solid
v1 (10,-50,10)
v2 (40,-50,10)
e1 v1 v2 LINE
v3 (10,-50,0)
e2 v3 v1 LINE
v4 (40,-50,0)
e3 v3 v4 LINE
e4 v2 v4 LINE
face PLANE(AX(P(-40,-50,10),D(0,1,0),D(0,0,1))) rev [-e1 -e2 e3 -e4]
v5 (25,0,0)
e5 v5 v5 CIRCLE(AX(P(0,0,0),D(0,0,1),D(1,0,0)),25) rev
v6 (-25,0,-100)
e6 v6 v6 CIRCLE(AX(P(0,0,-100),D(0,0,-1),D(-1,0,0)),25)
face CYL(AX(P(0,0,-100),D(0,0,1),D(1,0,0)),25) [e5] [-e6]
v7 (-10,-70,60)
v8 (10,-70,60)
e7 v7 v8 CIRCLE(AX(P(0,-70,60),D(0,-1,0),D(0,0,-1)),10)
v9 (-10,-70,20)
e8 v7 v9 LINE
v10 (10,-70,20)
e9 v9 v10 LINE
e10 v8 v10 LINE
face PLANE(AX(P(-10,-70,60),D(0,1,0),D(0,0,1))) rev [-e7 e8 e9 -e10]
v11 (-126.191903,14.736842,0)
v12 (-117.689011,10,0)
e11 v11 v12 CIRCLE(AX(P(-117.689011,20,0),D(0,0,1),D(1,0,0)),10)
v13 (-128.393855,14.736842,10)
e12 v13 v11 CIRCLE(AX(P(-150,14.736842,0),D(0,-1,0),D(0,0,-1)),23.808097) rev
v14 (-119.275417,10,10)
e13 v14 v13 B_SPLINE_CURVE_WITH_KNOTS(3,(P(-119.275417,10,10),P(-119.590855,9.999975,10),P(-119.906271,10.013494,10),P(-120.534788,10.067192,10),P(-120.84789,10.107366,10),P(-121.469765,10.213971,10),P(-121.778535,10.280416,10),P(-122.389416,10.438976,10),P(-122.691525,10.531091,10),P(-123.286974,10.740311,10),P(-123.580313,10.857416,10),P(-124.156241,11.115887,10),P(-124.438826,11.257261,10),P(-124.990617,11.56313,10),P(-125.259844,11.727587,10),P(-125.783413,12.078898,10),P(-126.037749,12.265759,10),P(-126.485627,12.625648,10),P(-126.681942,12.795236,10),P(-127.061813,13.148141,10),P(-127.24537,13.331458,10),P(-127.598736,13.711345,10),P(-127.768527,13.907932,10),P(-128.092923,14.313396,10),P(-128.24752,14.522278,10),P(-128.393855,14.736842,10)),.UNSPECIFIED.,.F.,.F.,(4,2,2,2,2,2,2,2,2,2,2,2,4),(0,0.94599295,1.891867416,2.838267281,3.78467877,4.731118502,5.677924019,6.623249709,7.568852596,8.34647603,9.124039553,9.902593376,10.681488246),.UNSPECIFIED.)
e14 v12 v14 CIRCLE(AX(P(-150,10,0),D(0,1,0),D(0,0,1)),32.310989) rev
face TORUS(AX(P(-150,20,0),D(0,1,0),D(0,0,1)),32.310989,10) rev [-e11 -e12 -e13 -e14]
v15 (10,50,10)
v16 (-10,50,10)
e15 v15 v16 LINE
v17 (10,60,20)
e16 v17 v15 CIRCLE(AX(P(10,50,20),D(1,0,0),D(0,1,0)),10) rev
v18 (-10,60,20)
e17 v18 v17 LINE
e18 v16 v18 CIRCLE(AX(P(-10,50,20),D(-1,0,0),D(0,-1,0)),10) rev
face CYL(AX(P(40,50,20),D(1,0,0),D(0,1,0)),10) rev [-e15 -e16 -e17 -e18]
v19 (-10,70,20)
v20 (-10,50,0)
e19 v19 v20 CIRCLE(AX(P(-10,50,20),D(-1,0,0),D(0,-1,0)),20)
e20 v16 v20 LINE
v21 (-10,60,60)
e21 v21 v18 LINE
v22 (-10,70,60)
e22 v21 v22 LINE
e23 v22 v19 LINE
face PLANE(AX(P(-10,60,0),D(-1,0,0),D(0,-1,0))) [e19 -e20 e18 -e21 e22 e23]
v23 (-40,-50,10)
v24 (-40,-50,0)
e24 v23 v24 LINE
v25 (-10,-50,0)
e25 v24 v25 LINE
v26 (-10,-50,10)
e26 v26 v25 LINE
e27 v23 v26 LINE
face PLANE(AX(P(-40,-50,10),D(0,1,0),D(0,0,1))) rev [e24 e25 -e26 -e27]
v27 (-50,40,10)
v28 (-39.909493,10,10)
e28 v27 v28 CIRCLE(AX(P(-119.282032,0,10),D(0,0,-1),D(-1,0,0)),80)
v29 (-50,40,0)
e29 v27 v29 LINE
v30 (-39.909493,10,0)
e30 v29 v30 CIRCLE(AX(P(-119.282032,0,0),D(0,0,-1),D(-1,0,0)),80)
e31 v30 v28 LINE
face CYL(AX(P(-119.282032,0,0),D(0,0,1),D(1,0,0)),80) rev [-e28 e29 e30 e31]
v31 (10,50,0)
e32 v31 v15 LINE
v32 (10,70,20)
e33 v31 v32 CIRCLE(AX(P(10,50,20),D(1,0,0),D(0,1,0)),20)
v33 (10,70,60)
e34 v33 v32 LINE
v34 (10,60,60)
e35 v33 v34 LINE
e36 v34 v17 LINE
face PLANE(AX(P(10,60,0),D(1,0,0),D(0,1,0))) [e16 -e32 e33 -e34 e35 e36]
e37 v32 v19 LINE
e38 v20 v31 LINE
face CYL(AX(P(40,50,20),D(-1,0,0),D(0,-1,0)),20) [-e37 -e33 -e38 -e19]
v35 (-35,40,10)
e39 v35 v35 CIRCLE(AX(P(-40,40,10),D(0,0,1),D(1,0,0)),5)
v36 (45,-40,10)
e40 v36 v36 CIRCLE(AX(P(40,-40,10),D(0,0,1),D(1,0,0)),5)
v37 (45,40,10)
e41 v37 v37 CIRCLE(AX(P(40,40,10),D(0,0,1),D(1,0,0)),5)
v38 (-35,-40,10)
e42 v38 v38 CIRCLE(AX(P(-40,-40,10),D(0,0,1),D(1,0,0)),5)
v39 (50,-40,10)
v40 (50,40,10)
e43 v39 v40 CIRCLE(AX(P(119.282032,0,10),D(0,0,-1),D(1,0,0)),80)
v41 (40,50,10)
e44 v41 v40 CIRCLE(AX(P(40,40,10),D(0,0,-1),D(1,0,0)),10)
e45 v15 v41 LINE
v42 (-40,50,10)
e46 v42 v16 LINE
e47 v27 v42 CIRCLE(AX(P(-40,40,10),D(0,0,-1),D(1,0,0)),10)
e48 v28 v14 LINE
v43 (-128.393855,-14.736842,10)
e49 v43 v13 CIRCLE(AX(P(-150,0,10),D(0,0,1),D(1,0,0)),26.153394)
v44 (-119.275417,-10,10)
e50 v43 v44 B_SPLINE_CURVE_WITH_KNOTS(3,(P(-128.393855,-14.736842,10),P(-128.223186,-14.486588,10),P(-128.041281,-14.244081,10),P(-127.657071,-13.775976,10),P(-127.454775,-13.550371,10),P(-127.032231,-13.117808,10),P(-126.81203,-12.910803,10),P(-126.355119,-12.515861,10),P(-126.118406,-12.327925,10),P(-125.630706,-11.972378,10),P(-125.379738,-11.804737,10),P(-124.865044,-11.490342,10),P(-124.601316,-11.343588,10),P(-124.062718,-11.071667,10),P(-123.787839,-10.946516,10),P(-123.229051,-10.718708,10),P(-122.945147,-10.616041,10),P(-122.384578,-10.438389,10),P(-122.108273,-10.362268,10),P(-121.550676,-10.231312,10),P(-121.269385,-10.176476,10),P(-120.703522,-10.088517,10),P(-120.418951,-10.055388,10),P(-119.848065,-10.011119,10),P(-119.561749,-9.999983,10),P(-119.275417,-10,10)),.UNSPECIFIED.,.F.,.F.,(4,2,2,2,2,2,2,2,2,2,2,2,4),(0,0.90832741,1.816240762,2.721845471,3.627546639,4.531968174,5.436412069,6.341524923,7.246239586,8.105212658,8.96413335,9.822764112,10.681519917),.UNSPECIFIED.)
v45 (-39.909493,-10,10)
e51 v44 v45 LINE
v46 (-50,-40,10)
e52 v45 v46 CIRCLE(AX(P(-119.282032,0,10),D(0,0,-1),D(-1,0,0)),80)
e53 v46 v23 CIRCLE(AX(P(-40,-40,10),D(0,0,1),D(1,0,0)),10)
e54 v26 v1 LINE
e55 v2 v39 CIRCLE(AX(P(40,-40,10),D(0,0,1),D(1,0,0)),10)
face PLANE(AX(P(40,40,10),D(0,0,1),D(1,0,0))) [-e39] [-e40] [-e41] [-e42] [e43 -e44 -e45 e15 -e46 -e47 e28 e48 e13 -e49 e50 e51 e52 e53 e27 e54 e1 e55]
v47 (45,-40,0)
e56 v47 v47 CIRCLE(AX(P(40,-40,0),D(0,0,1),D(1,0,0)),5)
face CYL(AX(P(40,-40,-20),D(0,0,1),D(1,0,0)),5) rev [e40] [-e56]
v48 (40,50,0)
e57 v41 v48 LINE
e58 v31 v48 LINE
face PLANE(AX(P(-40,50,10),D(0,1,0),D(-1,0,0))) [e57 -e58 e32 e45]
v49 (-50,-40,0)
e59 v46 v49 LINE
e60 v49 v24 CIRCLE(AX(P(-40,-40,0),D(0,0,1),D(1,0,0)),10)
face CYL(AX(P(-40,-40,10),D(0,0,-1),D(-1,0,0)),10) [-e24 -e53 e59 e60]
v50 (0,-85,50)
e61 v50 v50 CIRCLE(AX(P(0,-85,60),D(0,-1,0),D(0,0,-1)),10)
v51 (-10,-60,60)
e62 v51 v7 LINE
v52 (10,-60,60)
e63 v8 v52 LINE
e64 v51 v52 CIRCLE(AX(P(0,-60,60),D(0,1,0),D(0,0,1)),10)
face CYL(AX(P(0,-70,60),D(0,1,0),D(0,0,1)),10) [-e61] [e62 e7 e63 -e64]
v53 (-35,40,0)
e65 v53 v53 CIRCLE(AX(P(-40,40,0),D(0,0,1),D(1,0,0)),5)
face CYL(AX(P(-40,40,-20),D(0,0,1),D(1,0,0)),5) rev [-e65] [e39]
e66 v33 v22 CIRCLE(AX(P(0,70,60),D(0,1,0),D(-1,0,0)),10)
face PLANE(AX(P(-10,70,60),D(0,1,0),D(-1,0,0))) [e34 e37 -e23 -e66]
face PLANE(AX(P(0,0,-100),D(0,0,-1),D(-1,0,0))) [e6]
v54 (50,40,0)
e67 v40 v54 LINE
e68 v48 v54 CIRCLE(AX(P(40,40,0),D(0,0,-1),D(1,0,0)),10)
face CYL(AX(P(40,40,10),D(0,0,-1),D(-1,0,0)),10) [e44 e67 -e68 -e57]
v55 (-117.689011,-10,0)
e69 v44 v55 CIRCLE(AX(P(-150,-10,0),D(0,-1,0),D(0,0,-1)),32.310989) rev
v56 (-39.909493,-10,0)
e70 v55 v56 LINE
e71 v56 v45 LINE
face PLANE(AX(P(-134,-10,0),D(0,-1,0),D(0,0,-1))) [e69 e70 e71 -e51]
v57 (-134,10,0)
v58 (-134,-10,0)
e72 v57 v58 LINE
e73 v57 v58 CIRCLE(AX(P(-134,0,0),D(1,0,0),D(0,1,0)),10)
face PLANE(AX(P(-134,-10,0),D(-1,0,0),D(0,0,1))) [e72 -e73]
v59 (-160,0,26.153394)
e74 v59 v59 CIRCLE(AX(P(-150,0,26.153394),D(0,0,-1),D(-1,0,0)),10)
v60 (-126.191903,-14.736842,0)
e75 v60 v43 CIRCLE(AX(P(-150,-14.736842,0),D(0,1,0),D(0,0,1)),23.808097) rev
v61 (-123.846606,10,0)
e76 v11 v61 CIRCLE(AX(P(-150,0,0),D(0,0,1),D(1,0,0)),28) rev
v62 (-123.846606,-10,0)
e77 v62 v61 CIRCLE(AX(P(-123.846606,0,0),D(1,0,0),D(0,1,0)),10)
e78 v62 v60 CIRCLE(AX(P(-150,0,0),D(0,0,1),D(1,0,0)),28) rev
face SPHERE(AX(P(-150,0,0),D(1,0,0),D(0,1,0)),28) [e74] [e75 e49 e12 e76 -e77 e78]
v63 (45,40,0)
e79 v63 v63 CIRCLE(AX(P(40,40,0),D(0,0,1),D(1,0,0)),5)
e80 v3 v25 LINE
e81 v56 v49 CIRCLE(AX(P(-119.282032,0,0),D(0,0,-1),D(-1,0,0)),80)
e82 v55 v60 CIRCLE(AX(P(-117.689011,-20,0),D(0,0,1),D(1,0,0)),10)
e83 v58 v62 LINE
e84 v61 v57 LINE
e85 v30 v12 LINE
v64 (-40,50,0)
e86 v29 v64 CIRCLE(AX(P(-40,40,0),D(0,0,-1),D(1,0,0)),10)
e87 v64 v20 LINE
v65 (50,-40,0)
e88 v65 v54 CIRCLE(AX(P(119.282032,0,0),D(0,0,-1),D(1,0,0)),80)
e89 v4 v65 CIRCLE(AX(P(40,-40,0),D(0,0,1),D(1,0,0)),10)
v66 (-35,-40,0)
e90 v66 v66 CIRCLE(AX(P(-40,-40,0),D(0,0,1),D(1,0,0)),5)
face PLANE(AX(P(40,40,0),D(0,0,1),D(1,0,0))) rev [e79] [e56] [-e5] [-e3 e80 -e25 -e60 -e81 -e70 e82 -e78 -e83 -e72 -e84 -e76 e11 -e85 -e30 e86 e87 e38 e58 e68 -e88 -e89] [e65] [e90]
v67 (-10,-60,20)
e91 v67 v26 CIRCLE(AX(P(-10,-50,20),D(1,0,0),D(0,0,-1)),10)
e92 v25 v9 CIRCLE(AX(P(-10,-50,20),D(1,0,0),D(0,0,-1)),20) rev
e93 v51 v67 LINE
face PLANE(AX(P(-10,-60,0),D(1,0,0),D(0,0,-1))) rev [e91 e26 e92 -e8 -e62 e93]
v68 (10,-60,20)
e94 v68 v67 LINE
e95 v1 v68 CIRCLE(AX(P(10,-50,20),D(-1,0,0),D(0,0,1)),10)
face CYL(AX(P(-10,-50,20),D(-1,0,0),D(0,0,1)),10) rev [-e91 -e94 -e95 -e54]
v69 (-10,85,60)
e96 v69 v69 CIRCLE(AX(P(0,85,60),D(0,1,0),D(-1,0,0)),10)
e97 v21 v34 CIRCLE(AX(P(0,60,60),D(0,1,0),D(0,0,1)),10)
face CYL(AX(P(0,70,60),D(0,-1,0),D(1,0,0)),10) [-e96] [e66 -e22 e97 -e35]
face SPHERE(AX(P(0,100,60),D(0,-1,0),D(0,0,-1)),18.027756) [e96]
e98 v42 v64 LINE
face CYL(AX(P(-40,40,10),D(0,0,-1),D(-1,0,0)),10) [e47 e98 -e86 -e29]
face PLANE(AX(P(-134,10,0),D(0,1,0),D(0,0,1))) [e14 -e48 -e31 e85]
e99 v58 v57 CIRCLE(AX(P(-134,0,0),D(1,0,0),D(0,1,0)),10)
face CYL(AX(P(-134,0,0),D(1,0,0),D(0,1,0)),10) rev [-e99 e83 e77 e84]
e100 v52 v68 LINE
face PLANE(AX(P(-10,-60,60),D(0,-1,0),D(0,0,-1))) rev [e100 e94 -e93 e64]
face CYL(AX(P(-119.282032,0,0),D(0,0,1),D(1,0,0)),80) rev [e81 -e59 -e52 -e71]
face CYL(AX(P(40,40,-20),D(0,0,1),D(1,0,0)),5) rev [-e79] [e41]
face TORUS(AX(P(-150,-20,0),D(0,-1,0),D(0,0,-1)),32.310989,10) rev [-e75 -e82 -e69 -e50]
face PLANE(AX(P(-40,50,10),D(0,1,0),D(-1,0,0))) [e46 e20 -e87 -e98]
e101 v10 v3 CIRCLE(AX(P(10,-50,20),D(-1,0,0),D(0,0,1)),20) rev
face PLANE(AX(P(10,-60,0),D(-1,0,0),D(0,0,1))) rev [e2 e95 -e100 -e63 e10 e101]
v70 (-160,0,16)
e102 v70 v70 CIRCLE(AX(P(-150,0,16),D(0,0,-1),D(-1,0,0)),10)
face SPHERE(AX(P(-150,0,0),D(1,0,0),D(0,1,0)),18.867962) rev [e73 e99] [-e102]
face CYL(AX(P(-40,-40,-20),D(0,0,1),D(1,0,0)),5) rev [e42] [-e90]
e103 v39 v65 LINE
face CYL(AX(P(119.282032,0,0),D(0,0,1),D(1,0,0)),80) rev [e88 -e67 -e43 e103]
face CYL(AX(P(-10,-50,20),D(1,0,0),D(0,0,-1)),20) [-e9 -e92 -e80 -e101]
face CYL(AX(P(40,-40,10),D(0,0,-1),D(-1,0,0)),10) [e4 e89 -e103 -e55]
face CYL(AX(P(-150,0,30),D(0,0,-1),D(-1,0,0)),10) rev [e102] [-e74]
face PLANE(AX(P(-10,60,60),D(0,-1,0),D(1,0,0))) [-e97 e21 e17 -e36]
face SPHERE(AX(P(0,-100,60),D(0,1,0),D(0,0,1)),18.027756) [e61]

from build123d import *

# Parameters (mm, degrees)
BOSS_EXTRUDE1_DEPTH  = 10
CUT_EXTRUDE1_DEPTH   = 10
SKETCH6_W            = 20
SKETCH6_H            = 10
BOSS_EXTRUDE5_DEPTH  = 10
SKETCH7_W            = 20
SKETCH7_H            = 10
BOSS_EXTRUDE6_DEPTH  = 60
FILLET7_R            = 20
FILLET8_R            = 10
BOSS_EXTRUDE7_DEPTH  = 10
CUT_EXTRUDE7_DEPTH   = 18
FILLET7_OF_MIRROR2_R = 20
FILLET8_OF_MIRROR2_R = 10
SKETCH19_R           = 5
CUT_EXTRUDE9_DEPTH   = 30
SKETCH29_R           = 10
BOSS_EXTRUDE16_DEPTH = 15
SKETCH31_R           = 10
BOSS_EXTRUDE17_DEPTH = 15
BOSS_EXTRUDE21_DEPTH = 10
FILLET9_R            = 10
FILLET10_R           = 10
SKETCH35_R           = 10
CUT_EXTRUDE11_DEPTH  = 30
SKETCH16_R           = 25
BOSS_EXTRUDE22_DEPTH = 100


with BuildPart() as part:
    # Sketch2 → Boss-Extrude1 (new body)
    with BuildSketch(Plane.XY):
        with BuildLine():
            Line((-40, 50), (40, 50))
            ThreePointArc((40, 50), (47.071067812, 47.071067812), (50, 40))
            Line((50, 40), (50, -40))
            ThreePointArc((50, -40), (47.071067812, -47.071067812), (40, -50))
            Line((40, -50), (-40, -50))
            ThreePointArc((-40, -50), (-47.071067812, -47.071067812), (-50, -40))
            Line((-50, -40), (-50, 40))
            ThreePointArc((-50, 40), (-47.071067812, 47.071067812), (-40, 50))
        make_face()
    boss_extrude1 = extrude(amount=BOSS_EXTRUDE1_DEPTH)

    # Sketch3 → Cut-Extrude1 (cut)
    with BuildSketch(Plane.XY.offset(10)):
        with BuildLine():
            Line((-50, 40), (-50, -40))
            ThreePointArc((-50, -40), (-39.282032303, 0), (-50, 40))
        make_face()
        with BuildLine():
            Line((50, 40), (50, -40))
            ThreePointArc((50, -40), (39.282032303, 0), (50, 40))
        make_face()
    cut_extrude1 = extrude(amount=-CUT_EXTRUDE1_DEPTH, mode=Mode.SUBTRACT)

    # Sketch6 → Boss-Extrude5 (add)
    with BuildSketch(Plane.XZ.offset(50)):
        with Locations((0, 5)):
            Rectangle(SKETCH6_W, SKETCH6_H)
    boss_extrude5 = extrude(amount=BOSS_EXTRUDE5_DEPTH)

    # Sketch7 → Boss-Extrude6 (add)
    with BuildSketch(Plane.XY):
        with Locations((0, -65)):
            Rectangle(SKETCH7_W, SKETCH7_H)
    boss_extrude6 = extrude(amount=BOSS_EXTRUDE6_DEPTH)

    # Fillet7
    fillet7_edges = [part.edges().sort_by_distance(p)[0] for p in [
        (0, -70, 0),
    ]]
    fillet(fillet7_edges, radius=FILLET7_R)

    # Fillet8
    fillet8_edges = [part.edges().sort_by_distance(p)[0] for p in [
        (0, -60, 10),
    ]]
    fillet(fillet8_edges, radius=FILLET8_R)

    # Sketch8 → Boss-Extrude7 (add)
    with BuildSketch(Plane(origin=(0, -60, 0), x_dir=(1, 0, 0), z_dir=(0, 1, 0))):
        with BuildLine():
            Line((10, -60), (-10, -60))
            ThreePointArc((-10, -60), (0, -70), (10, -60))
        make_face()
    boss_extrude7 = extrude(amount=-BOSS_EXTRUDE7_DEPTH)

    # Sketch14 → Cut-Extrude7 (cut)
    with BuildSketch(Plane.XY.offset(10)):
        with BuildLine():
            Line((-39.282032303, 0), (39.282032303, 0))
            add(Edge.make_bspline(
                [(50, 40), (39.359472874, 21.350658255), (39.282032303, 0)],
                knots=[0, 0, 0, 1, 1, 1], degree=2))
            add(Edge.make_bspline(
                [(40, 50), (49.142135624, 49.142135624), (50, 40)],
                knots=[0, 0, 0, 1, 1, 1], degree=2))
            Line((40, 50), (-40, 50))
            add(Edge.make_bspline(
                [(-50, 40), (-49.142135624, 49.142135624), (-40, 50)],
                knots=[0, 0, 0, 1, 1, 1], degree=2))
            add(Edge.make_bspline(
                [(-39.282032303, 0), (-39.359472874, 21.350658255), (-50, 40)],
                knots=[0, 0, 0, 1, 1, 1], degree=2))
        make_face()
    extrude(amount=-CUT_EXTRUDE7_DEPTH, mode=Mode.SUBTRACT)


with BuildPart() as cut_extrude7_kept_piece:
    # of the separate pieces the step leaves, the one the design keeps (cut_extrude7_pieces_kept)
    add(part.part.solids().sort_by_distance((-10, -60, 20))[0])

    # Mirror2: Boss-Extrude1, Cut-Extrude1, Boss-Extrude5, Boss-Extrude6, Boss-Extrude7 across plane
    add(boss_extrude1.mirror(Plane(origin=(-39.282032303, 0, -8), x_dir=(0, 0, 1), z_dir=(0, -1, 0))))
    add(cut_extrude1.mirror(Plane(origin=(-39.282032303, 0, -8), x_dir=(0, 0, 1), z_dir=(0, -1, 0))), mode=Mode.SUBTRACT)
    add(boss_extrude5.mirror(Plane(origin=(-39.282032303, 0, -8), x_dir=(0, 0, 1), z_dir=(0, -1, 0))))
    add(boss_extrude6.mirror(Plane(origin=(-39.282032303, 0, -8), x_dir=(0, 0, 1), z_dir=(0, -1, 0))))
    add(boss_extrude7.mirror(Plane(origin=(-39.282032303, 0, -8), x_dir=(0, 0, 1), z_dir=(0, -1, 0))))

    # Fillet7 of Mirror2
    fillet7_of_mirror2_edges = [cut_extrude7_kept_piece.edges().sort_by_distance(p)[0] for p in [
        (0, 70, 0),
    ]]
    fillet(fillet7_of_mirror2_edges, radius=FILLET7_OF_MIRROR2_R)

    # Fillet8 of Mirror2
    fillet8_of_mirror2_edges = [cut_extrude7_kept_piece.edges().sort_by_distance(p)[0] for p in [
        (0, 60, 10),
    ]]
    fillet(fillet8_of_mirror2_edges, radius=FILLET8_OF_MIRROR2_R)

    # Sketch19 → Cut-Extrude9 (cut)
    with BuildSketch(Plane.XY.offset(10)):
        with Locations((-40, 40)):
            Circle(SKETCH19_R)
        with Locations((40, 40)):
            Circle(SKETCH19_R)
        with Locations((-40, -40)):
            Circle(SKETCH19_R)
        with Locations((40, -40)):
            Circle(SKETCH19_R)
    extrude(amount=-CUT_EXTRUDE9_DEPTH, mode=Mode.SUBTRACT)

    # Sketch29 → Boss-Extrude16 (add)
    with BuildSketch(Plane(origin=(0, 70, 0), x_dir=(1, 0, 0), z_dir=(0, 1, 0))):
        with Locations(Location((0, -60, 0), (0, 0, 180))):
            Circle(SKETCH29_R)
    extrude(amount=BOSS_EXTRUDE16_DEPTH)

    # Sketch30 → Revolve2 (revolve)
    with BuildSketch(Plane(origin=(0, 0, 0), x_dir=(0, 0, -1), z_dir=(1, 0, 0))):
        with BuildLine():
            Line((-60, 118.027756377), (-60, 85))
            Line((-60, 85), (-50, 85))
            ThreePointArc((-50, 85), (-42.745778116, 105.224158035), (-60, 118.027756377))
        make_face()
    revolve(axis=Axis((0, 85, 60), (0, 1, 0)))

    # Sketch31 → Boss-Extrude17 (add)
    with BuildSketch(Plane.XZ.offset(70)):
        with Locations(Location((0, 60, 0), (0, 0, 180))):
            Circle(SKETCH31_R)
    extrude(amount=BOSS_EXTRUDE17_DEPTH)

    # Sketch32 → Revolve3 (revolve)
    with BuildSketch(Plane(origin=(0, 0, 0), x_dir=(0, 0, -1), z_dir=(1, 0, 0))):
        with BuildLine():
            Line((-60, -118.027756377), (-60, -85))
            Line((-60, -85), (-70, -85))
            ThreePointArc((-70, -85), (-77.254221884, -105.224158035), (-60, -118.027756377))
        make_face()
    revolve(axis=Axis((0, -85, 60), (0, -1, 0)))

    # Sketch33 → Boss-Extrude21 (add)
    with BuildSketch(Plane.XY.offset(10)):
        with BuildLine():
            Line((-134, 10), (-39.909492971, 10))
            ThreePointArc((-39.909492971, 10), (-39.282032303, 0), (-39.909492971, -10))
            Line((-39.909492971, -10), (-134, -10))
            Line((-134, -10), (-134, 10))
        make_face()
    extrude(amount=-BOSS_EXTRUDE21_DEPTH)

    # Sketch34 → Revolve5 (revolve)
    with BuildSketch(Plane.XY):
        with BuildLine():
            Line((-178, 0), (-168.867962264, 0))
            ThreePointArc((-168.867962264, 0), (-155.201567253, 18.136805069), (-134, 10))
            Line((-134, 10), (-123.846606339, 10))
            ThreePointArc((-123.846606339, 10), (-155.08453427, 27.534478591), (-178, 0))
        make_face()
    revolve(axis=Axis((-134, 0, 0), (-1, 0, 0)))

    # Fillet9
    # the kernel refuses this fillet: 10 mm, written as the material it adds along each edge
    with BuildSketch(Plane(origin=(-150, 10, 0), x_dir=(1, 0, 0), z_dir=(0, 0, -1))) as fillet9_piece_1_section:
        with BuildLine():
            CenterArc((32.310988843, -10), FILLET9_R, 90, 58.243136141)
            ThreePointArc((23.808097042, -4.736842105), (25.09276901, -2.423886002), (26.153393661, 0))
            Line((26.153393661, 0), (32.310988843, 0))
        make_face()
    fillet9_piece_1 = revolve(axis=Axis((-150, 10, 0), (0, -1, 0)), revolution_arc=56.205276657, mode=Mode.PRIVATE)
    fillet9_piece_1 = split(fillet9_piece_1, bisect_by=Plane(origin=(-123.595029593, 11.027181376, 10), z_dir=(0, 0, -1)), keep=Keep.TOP, mode=Mode.PRIVATE)
    add(fillet9_piece_1)

    # Fillet10
    # the kernel refuses this fillet: 10 mm, written as the material it adds along each edge
    with BuildSketch(Plane(origin=(-150, -10, 0), x_dir=(0.5562190835944724, 0, 0.8310356978164808), z_dir=(-0.8310356978164808, 0, 0.5562190835944724))) as fillet10_piece_1_section:
        with BuildLine():
            CenterArc((32.310988843, -10), FILLET10_R, 90, 58.243136141)
            ThreePointArc((23.808097042, -4.736842105), (25.09276901, -2.423886002), (26.153393661, 0))
            Line((26.153393661, 0), (32.310988843, 0))
        make_face()
    fillet10_piece_1 = revolve(axis=Axis((-150, -10, 0), (0, 1, 0)), revolution_arc=56.205276657, mode=Mode.PRIVATE)
    fillet10_piece_1 = split(fillet10_piece_1, bisect_by=Plane(origin=(-123.595029593, -11.027181376, 10), z_dir=(0, 0, -1)), keep=Keep.TOP, mode=Mode.PRIVATE)
    add(fillet10_piece_1)

    # Sketch35 → Cut-Extrude11 (cut)
    with BuildSketch(Plane.XY):
        with Locations(Location((-150, 0, 0), (0, 0, 180))):
            Circle(SKETCH35_R)
    extrude(amount=CUT_EXTRUDE11_DEPTH, mode=Mode.SUBTRACT)

    # Sketch16 → Boss-Extrude22 (add)
    with BuildSketch(Plane(origin=(0, 0, 0), x_dir=(-1, 0, 0), z_dir=(0, 0, -1))):
        with Locations(Location((0, 0, 0), (0, 0, 180))):
            Circle(SKETCH16_R)
    extrude(amount=BOSS_EXTRUDE22_DEPTH)


solid = cut_extrude7_kept_piece.part
